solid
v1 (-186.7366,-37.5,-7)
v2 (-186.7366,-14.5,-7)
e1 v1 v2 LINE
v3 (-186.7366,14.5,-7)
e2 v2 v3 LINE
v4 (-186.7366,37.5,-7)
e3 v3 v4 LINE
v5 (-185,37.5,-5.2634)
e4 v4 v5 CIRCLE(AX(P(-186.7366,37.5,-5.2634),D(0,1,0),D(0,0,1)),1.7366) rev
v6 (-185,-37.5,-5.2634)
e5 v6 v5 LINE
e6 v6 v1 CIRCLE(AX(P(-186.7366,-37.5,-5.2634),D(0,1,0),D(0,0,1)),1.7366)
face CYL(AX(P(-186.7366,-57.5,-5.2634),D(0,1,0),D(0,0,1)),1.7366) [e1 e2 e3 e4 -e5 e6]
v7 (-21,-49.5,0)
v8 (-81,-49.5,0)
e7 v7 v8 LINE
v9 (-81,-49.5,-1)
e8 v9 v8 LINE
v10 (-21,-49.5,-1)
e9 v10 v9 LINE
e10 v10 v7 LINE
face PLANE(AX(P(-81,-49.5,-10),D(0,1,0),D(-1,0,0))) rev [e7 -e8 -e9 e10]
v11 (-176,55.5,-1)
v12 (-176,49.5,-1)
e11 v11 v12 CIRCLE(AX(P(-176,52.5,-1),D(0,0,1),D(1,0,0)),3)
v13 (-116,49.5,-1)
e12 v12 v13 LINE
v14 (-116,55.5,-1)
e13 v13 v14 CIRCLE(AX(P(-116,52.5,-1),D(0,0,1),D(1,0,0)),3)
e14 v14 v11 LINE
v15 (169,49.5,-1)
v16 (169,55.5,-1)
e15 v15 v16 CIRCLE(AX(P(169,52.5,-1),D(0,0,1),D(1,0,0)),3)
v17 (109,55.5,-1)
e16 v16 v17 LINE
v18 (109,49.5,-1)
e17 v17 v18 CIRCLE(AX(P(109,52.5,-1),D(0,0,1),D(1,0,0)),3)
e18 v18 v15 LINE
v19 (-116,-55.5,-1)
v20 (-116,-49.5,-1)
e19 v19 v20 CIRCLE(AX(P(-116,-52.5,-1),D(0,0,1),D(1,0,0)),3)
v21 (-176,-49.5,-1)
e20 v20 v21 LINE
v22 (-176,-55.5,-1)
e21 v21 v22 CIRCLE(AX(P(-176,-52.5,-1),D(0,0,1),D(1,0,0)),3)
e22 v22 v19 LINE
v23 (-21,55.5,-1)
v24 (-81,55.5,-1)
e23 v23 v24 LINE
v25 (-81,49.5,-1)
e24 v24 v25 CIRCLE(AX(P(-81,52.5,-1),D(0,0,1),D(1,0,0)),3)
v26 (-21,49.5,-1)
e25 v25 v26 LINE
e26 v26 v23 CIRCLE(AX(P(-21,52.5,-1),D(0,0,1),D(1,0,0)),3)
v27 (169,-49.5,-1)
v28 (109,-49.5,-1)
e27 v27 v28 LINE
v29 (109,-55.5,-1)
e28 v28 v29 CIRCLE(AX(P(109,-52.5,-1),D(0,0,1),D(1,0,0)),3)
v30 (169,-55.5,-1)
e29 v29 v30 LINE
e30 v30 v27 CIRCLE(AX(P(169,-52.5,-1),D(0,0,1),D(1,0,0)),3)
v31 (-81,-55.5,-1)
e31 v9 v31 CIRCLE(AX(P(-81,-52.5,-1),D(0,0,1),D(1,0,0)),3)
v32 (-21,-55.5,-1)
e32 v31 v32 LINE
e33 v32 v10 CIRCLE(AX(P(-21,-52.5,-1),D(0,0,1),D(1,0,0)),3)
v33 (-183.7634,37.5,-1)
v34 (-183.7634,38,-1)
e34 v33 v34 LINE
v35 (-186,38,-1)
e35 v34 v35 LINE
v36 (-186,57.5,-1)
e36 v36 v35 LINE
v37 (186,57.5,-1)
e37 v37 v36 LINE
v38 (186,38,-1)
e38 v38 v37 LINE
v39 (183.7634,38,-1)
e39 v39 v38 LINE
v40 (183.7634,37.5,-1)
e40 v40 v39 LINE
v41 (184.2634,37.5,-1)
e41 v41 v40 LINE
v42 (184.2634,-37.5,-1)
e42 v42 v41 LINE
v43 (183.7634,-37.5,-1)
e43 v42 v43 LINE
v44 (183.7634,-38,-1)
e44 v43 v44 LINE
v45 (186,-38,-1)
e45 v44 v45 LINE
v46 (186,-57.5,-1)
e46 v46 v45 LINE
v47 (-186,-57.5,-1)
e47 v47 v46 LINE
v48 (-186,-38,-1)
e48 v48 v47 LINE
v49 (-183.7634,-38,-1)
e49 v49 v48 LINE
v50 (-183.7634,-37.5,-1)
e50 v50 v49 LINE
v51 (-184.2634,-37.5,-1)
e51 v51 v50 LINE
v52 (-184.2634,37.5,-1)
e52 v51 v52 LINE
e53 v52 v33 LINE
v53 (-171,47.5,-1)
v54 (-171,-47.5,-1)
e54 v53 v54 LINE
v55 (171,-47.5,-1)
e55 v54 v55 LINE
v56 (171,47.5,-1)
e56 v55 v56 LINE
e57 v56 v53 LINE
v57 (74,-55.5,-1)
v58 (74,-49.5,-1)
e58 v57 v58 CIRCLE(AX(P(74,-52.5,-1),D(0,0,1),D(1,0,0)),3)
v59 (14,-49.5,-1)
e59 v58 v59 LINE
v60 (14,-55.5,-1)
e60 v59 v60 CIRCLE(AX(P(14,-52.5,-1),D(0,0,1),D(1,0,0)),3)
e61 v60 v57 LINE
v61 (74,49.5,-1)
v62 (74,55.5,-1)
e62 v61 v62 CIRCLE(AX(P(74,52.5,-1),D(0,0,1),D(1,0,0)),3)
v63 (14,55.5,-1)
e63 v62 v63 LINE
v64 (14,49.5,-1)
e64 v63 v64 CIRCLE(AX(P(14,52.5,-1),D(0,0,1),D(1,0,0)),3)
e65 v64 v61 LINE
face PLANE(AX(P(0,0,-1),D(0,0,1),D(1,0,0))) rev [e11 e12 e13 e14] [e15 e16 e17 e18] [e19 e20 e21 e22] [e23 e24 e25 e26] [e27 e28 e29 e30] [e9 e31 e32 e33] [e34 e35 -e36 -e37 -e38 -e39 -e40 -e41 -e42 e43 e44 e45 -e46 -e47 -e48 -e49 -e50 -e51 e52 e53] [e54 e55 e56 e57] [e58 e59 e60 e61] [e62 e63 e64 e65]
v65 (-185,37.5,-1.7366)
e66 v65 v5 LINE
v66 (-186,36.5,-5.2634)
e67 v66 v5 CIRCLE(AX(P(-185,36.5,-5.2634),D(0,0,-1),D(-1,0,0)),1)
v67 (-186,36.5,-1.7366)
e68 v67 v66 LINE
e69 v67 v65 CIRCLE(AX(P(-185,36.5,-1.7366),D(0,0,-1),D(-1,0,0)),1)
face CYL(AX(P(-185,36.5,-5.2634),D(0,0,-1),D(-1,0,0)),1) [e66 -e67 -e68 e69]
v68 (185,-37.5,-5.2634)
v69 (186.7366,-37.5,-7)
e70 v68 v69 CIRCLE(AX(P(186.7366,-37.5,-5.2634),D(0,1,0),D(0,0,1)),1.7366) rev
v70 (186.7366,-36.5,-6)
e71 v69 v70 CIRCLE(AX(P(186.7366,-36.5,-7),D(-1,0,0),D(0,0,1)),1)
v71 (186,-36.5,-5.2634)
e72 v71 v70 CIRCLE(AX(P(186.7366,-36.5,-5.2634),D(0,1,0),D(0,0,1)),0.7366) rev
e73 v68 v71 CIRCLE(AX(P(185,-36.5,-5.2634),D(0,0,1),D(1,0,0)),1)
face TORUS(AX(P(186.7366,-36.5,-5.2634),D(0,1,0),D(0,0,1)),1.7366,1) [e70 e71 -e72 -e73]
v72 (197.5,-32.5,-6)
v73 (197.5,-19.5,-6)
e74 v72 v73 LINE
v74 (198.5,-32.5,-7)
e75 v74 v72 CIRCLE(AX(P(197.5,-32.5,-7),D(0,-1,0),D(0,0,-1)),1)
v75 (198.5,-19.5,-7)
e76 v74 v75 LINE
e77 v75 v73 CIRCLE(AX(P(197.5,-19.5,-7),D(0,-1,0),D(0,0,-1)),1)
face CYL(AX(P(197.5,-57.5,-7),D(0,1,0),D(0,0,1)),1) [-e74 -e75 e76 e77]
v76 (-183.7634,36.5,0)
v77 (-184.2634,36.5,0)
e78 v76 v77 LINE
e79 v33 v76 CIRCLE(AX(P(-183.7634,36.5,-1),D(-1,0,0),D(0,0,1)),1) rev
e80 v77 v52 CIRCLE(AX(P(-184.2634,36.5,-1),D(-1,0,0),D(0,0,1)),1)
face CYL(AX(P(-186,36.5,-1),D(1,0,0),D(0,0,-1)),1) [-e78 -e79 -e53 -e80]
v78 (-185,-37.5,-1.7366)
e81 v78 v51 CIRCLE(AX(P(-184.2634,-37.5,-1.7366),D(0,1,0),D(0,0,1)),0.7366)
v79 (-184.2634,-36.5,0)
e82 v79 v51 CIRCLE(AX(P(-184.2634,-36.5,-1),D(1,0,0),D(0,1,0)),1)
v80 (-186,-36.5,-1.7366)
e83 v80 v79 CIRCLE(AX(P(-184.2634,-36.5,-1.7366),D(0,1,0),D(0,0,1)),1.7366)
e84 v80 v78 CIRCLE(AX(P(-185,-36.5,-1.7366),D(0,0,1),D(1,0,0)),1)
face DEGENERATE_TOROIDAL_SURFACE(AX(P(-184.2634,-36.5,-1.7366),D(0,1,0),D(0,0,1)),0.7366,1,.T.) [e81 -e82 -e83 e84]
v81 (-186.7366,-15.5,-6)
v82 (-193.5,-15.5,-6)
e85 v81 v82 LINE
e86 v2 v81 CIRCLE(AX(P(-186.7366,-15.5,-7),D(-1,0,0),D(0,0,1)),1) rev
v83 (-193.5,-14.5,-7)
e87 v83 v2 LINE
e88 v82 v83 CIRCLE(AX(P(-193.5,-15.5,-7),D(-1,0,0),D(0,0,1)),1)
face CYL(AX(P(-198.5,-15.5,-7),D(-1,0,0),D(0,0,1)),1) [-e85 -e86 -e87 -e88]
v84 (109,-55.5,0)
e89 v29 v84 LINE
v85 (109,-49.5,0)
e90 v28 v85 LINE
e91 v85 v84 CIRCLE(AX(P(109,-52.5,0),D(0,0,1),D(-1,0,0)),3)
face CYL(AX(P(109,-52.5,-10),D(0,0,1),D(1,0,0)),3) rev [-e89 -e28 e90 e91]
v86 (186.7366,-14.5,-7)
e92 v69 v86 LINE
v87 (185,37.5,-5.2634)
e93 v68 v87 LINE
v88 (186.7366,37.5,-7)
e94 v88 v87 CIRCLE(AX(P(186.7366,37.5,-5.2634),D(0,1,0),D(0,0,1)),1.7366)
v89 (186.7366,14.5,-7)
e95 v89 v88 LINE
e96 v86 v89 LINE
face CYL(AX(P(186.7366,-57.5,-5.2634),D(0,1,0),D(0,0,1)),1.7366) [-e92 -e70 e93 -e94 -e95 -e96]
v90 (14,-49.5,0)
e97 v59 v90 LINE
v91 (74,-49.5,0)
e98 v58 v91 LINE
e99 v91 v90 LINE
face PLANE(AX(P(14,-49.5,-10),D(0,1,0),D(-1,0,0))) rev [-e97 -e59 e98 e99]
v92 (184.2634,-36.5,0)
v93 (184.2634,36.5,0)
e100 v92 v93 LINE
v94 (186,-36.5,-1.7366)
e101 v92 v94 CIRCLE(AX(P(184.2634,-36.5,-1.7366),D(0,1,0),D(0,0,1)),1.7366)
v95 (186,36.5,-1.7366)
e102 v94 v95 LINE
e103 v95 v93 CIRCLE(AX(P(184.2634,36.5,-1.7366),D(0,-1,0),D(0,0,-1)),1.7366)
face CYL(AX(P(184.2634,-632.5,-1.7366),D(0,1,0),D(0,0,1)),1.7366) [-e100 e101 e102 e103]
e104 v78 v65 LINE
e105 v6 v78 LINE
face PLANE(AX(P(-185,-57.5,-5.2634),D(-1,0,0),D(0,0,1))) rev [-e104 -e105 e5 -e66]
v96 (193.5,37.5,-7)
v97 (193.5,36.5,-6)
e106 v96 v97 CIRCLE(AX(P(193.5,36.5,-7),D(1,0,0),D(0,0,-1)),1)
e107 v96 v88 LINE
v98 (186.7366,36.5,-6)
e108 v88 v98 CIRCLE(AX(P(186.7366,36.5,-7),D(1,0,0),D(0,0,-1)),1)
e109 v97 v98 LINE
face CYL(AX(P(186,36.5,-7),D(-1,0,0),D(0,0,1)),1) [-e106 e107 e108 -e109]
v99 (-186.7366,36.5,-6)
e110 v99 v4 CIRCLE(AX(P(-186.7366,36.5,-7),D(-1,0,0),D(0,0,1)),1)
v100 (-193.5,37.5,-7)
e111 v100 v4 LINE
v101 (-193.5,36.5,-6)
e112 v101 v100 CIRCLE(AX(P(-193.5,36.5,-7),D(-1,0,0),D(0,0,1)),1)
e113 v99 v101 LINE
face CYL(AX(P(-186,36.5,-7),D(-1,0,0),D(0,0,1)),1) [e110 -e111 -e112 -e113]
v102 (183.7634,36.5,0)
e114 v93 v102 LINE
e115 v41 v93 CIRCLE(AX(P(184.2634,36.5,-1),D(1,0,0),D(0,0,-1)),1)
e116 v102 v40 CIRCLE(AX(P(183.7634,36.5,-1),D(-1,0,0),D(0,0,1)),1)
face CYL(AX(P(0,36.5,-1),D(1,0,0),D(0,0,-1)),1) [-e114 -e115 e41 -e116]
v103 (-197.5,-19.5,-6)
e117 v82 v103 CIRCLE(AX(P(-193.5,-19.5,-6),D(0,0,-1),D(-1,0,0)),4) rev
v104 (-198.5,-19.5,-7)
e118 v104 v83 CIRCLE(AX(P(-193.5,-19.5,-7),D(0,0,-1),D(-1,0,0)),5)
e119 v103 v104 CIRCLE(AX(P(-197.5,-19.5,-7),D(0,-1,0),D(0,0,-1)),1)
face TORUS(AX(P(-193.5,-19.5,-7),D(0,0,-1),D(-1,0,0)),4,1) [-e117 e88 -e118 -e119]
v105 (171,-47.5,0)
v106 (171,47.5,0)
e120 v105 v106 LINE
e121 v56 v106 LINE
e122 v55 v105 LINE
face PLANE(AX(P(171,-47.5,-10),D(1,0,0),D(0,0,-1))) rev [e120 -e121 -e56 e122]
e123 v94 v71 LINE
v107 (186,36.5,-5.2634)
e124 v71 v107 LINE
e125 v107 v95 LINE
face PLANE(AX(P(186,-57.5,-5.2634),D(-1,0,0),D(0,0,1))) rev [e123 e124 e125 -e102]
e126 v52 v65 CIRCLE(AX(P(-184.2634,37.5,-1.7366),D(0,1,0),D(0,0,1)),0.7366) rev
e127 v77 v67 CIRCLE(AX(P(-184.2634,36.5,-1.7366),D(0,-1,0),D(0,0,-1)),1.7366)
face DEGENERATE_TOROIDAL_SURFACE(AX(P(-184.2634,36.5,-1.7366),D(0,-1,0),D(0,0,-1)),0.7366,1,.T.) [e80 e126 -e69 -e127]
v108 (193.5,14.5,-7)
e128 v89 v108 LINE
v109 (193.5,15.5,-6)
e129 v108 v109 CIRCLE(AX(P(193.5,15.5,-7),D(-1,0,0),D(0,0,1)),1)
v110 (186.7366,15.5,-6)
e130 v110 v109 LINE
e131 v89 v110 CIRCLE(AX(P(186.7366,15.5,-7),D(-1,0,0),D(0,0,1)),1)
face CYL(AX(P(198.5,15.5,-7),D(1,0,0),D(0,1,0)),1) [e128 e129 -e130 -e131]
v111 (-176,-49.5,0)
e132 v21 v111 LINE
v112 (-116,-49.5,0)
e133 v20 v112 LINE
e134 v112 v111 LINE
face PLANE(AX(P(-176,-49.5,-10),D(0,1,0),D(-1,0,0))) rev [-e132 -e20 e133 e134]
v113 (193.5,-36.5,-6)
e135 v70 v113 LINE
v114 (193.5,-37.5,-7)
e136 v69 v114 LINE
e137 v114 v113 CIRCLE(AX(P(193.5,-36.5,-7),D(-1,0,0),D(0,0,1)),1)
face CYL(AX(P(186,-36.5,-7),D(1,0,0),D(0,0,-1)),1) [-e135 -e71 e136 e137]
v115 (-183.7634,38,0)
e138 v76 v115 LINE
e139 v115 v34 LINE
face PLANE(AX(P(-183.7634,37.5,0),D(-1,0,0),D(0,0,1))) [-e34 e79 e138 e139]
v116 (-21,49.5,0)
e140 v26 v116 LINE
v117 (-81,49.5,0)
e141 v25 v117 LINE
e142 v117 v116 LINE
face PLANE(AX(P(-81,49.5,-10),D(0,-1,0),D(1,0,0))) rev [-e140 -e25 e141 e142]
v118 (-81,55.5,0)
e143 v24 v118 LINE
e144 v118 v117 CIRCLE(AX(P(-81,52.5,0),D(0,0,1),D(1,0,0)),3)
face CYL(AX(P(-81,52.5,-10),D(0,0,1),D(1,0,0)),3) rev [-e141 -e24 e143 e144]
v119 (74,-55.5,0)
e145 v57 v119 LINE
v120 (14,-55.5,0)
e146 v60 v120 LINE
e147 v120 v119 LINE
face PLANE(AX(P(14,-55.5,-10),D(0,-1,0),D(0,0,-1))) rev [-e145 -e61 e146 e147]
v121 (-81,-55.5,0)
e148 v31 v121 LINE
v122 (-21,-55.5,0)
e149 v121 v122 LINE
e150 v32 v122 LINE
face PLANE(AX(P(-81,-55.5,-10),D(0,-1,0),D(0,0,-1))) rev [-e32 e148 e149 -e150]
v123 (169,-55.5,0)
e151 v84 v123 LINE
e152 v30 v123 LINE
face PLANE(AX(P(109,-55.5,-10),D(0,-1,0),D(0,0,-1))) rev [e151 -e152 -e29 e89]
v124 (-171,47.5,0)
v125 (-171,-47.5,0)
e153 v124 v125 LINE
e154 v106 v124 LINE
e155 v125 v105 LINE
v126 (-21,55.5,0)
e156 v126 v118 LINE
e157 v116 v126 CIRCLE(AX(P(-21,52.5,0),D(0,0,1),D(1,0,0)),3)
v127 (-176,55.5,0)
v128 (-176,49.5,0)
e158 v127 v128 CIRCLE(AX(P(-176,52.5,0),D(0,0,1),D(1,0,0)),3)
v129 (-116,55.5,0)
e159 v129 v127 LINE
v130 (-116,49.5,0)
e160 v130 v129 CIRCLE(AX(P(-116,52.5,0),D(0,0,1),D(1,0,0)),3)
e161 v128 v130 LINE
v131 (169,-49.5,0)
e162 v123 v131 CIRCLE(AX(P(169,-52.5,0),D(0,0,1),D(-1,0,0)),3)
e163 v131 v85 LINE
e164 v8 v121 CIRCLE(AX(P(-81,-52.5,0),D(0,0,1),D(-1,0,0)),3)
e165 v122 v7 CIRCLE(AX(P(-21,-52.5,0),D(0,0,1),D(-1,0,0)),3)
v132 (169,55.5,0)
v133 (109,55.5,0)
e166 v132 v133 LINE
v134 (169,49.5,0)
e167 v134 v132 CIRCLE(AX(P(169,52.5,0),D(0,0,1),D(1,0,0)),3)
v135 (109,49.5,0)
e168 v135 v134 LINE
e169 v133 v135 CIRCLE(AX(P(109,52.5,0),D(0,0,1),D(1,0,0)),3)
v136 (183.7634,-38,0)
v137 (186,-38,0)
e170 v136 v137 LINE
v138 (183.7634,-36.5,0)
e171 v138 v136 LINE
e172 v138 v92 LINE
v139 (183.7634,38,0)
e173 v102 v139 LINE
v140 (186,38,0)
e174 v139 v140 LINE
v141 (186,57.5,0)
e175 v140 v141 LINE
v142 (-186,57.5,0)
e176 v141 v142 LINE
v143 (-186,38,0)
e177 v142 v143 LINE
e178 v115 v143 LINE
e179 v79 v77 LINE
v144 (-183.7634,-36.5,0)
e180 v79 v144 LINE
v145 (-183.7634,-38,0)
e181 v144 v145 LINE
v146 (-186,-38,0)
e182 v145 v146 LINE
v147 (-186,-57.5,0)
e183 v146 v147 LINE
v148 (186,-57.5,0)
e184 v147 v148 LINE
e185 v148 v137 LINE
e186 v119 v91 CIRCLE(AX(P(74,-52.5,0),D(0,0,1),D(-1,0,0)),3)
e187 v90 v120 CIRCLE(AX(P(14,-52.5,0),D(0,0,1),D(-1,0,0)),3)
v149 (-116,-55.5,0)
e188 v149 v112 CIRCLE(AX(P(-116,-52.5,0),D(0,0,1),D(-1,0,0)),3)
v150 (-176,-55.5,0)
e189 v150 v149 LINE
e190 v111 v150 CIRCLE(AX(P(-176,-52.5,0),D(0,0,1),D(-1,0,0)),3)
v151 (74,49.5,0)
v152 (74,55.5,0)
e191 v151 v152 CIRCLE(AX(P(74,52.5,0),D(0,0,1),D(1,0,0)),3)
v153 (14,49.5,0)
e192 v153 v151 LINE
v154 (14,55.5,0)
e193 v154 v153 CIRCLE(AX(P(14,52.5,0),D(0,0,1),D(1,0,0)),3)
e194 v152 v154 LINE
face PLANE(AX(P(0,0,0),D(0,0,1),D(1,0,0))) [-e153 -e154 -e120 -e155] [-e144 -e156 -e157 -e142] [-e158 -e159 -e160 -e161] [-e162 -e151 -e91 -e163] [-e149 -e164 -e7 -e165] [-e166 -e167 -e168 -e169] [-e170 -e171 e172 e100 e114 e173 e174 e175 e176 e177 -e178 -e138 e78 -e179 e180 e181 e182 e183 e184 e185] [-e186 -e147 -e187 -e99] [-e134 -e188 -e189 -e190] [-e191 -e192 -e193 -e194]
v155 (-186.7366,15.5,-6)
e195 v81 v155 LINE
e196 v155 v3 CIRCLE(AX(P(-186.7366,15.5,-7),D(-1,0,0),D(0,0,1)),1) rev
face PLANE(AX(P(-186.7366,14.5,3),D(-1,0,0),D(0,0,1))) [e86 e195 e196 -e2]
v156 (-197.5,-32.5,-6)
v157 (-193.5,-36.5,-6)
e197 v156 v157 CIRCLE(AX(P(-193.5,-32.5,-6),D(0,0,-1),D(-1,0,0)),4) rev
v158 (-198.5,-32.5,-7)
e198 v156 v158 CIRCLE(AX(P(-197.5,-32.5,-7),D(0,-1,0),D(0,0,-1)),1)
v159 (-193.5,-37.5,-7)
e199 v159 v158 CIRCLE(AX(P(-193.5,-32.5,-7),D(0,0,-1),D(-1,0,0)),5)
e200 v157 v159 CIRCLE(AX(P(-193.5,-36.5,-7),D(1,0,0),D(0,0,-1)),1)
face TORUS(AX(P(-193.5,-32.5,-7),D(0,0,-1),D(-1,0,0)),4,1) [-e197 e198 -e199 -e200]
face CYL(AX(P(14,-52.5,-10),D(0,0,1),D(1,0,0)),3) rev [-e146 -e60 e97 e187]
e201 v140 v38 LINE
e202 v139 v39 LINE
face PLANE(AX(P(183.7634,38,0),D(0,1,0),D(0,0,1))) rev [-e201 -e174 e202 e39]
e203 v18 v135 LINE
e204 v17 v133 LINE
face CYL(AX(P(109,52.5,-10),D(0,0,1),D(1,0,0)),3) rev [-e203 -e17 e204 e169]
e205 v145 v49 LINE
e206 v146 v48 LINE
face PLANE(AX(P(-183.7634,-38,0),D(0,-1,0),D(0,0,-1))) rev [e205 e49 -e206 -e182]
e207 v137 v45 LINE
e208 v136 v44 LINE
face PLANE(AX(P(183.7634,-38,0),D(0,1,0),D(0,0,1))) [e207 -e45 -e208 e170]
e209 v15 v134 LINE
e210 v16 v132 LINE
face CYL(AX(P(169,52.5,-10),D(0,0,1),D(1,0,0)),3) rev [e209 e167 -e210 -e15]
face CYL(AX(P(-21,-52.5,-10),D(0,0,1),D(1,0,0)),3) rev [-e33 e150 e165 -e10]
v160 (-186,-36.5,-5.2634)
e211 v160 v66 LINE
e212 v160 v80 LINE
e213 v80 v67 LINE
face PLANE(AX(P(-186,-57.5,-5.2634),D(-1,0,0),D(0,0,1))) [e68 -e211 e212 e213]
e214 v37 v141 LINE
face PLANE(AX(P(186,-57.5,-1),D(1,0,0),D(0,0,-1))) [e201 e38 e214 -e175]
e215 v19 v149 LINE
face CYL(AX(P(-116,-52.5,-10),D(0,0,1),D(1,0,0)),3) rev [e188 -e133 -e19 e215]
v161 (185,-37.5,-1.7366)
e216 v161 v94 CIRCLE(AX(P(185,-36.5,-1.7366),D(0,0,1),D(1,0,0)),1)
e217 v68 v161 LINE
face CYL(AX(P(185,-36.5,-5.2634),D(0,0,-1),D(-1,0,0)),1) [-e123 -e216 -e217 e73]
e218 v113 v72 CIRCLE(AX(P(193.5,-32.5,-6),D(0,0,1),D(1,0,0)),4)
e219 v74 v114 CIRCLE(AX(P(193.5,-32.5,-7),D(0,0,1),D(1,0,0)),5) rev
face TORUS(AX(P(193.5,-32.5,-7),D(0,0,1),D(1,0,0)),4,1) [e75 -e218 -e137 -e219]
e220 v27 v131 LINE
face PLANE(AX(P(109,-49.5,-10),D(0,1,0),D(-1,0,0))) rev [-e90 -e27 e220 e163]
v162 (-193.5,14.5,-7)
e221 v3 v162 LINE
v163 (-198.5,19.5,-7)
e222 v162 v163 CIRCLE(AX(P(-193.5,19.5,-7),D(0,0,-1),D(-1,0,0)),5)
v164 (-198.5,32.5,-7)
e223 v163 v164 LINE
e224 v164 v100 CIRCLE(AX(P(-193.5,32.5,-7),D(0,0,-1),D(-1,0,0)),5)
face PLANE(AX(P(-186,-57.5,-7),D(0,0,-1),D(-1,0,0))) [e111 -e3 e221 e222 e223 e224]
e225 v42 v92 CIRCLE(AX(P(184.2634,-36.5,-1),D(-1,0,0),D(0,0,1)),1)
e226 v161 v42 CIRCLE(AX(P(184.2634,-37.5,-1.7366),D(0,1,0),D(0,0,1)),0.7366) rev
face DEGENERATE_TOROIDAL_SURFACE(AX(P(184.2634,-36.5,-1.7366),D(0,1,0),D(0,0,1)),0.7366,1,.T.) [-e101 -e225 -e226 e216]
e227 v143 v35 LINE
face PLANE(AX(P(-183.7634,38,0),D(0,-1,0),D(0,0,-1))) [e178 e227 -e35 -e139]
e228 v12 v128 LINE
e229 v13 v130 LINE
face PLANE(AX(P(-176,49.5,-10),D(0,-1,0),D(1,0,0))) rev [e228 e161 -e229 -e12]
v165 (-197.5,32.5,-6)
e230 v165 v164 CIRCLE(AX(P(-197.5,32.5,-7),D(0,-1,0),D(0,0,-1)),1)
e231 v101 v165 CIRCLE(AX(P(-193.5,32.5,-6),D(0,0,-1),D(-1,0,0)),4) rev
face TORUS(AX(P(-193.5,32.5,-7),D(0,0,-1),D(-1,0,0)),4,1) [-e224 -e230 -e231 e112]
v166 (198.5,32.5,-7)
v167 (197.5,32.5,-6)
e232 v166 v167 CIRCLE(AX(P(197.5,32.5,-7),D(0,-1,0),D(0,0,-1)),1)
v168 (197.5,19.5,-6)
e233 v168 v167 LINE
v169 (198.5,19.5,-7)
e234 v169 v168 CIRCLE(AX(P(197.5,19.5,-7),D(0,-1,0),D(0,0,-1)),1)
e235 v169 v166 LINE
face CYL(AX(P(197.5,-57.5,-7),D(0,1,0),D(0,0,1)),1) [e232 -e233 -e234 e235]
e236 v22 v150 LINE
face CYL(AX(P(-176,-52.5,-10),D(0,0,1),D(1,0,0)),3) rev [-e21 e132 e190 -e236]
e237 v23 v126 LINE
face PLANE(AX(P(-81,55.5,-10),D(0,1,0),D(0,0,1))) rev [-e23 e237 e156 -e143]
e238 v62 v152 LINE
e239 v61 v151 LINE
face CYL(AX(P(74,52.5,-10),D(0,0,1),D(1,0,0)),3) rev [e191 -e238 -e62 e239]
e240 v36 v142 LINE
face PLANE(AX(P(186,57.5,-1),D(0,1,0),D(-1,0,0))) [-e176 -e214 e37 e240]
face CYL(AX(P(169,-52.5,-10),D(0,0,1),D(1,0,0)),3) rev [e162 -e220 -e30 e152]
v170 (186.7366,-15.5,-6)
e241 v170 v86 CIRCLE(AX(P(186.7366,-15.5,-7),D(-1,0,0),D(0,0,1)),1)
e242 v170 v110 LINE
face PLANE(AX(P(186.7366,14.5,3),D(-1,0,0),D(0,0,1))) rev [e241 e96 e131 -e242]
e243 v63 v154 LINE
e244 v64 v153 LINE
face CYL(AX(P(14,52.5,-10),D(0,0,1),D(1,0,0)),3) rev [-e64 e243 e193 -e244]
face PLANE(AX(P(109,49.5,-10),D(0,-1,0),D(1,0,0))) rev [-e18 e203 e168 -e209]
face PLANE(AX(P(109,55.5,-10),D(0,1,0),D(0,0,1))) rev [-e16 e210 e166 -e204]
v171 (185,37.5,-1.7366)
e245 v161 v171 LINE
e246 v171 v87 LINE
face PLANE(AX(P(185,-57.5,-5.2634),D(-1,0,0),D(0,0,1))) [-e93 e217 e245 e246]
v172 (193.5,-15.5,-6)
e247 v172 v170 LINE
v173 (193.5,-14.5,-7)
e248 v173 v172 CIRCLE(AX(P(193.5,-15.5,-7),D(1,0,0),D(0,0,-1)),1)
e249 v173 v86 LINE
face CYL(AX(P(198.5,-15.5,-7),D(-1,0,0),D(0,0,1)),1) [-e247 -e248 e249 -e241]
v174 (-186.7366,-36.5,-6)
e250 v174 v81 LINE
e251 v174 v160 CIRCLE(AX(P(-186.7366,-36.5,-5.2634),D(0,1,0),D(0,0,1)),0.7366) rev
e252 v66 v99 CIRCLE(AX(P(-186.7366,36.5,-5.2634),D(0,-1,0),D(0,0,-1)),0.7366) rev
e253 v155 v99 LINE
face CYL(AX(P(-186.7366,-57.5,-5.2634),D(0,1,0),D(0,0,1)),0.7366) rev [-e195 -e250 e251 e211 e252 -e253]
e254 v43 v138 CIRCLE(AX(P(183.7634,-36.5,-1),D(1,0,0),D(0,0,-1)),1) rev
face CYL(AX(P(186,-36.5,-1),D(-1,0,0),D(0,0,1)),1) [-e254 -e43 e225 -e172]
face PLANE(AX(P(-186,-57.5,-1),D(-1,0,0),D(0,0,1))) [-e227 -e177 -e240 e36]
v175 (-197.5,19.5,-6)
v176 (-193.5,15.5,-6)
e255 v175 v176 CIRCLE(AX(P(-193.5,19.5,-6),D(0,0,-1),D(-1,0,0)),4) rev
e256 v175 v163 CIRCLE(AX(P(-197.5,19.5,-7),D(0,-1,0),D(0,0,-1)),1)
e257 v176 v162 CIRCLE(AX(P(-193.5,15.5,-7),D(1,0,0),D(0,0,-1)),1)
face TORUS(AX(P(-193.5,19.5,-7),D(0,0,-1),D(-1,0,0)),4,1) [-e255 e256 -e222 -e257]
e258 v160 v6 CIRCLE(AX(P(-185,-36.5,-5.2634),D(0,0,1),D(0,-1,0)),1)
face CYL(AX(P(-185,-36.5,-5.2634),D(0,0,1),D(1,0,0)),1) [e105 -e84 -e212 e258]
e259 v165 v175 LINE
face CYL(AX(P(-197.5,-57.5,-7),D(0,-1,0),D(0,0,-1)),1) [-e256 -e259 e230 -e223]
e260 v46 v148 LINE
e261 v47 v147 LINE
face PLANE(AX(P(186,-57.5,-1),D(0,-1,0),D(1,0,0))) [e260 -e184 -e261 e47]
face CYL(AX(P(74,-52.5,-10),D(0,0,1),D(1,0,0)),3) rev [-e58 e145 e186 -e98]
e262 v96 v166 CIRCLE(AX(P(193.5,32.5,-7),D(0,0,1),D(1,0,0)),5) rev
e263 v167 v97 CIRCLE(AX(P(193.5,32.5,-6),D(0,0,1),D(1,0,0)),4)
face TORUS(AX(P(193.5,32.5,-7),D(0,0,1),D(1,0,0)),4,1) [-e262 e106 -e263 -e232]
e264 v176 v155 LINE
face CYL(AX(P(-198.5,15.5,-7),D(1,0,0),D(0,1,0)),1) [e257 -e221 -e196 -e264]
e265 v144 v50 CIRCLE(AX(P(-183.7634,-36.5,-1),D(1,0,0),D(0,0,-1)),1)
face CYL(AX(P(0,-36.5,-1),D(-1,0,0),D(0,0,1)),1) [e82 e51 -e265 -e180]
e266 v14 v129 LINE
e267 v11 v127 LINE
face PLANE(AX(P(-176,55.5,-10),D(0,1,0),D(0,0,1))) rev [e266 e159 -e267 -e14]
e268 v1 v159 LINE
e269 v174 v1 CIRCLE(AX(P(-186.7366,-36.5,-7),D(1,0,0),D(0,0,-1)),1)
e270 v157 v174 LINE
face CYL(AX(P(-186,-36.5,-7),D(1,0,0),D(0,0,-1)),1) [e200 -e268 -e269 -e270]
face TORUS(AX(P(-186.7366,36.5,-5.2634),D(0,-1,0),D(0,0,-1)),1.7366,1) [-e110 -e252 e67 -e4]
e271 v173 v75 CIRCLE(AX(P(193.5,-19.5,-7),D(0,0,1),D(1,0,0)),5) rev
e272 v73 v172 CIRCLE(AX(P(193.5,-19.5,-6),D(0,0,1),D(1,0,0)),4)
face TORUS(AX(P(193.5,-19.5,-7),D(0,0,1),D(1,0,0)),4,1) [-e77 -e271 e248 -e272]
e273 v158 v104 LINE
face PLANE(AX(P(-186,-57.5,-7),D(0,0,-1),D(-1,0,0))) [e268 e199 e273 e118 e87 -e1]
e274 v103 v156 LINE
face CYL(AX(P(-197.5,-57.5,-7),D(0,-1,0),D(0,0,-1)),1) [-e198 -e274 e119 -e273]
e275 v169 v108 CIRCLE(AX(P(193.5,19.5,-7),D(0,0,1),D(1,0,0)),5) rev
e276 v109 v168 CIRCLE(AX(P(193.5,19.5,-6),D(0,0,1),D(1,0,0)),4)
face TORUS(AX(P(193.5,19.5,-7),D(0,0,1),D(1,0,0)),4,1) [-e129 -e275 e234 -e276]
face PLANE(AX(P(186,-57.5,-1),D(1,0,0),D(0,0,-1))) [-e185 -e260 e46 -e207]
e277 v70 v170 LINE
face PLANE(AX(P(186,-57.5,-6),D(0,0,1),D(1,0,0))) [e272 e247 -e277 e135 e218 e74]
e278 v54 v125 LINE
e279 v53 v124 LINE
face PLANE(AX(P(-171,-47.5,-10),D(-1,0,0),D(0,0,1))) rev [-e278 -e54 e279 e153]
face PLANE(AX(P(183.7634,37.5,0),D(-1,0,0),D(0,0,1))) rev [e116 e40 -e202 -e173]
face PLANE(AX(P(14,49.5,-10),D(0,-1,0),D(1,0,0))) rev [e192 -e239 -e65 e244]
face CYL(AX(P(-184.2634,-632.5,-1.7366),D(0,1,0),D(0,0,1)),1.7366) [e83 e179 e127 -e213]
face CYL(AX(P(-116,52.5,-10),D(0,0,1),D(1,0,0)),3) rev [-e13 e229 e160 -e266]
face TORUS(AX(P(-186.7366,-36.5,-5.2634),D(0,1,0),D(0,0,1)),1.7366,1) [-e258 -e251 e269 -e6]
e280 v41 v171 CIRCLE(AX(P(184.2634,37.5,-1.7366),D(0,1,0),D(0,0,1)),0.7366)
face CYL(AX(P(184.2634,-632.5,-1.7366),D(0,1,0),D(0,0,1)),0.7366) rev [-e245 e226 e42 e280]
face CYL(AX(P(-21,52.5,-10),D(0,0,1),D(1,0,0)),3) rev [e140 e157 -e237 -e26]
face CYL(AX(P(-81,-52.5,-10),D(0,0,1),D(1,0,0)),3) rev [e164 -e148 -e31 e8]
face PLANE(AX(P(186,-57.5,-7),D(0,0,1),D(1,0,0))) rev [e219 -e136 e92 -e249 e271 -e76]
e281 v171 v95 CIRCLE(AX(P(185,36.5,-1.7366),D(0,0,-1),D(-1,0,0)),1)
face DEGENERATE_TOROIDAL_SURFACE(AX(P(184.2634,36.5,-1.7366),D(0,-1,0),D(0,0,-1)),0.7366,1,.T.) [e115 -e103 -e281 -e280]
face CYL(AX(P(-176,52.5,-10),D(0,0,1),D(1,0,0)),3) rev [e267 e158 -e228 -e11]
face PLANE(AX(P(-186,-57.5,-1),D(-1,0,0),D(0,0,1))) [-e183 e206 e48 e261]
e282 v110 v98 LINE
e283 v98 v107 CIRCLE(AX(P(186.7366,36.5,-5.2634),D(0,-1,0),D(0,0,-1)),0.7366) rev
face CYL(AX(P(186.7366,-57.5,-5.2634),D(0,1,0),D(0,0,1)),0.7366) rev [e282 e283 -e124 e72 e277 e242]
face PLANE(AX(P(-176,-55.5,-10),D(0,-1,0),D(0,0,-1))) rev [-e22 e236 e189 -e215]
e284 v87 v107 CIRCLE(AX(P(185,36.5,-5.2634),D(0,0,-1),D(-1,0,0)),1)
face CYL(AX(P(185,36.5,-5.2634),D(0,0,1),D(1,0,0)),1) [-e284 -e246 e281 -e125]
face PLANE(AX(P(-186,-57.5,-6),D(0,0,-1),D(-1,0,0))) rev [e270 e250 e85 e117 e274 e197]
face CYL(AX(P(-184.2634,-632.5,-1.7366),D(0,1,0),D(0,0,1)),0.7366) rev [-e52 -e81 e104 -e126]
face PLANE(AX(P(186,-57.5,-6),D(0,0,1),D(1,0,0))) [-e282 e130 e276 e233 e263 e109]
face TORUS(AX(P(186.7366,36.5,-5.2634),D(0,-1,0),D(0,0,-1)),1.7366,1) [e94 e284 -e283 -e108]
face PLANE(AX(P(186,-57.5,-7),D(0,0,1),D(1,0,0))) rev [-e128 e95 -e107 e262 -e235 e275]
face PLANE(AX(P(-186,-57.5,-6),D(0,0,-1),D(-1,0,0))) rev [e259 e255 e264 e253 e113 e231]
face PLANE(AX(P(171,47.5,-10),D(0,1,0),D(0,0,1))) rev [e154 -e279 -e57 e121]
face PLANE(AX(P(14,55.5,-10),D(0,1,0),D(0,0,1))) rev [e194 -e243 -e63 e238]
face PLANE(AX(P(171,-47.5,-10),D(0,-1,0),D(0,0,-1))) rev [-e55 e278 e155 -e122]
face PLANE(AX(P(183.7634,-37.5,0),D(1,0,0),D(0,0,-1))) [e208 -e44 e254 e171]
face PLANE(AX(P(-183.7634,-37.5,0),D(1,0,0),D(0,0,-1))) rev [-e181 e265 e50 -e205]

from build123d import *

# Parameters (mm, degrees)
SKETCH_1_W             = 372
SKETCH_1_H             = 115
SM_BASE_FLANGE_1_DEPTH = 1
SKETCH_6_W             = 342
SKETCH_6_H             = 95
CUT_EXTRUDE_1_DEPTH    = 10
CUT_EXTRUDE_2_DEPTH    = 10
PATTERN_LINEAR_1_COUNT = 4
PATTERN_LINEAR_1_PITCH = 95
OTHER_START            = -38
OTHER_1_DEPTH          = 76
OTHER_1_2_DEPTH        = 0.5
OTHER_START_2          = 37.5
OTHER_1_3_DEPTH        = 0.5
OTHER_START_3          = -37.5
OTHER_1_4_DEPTH        = 75
SKETCH_15_W            = 11.7634
SKETCH_15_H            = 29
CUT_EXTRUDE_3_DEPTH    = 10
FILLET_1_R             = 5
FILLET_2_R             = 1
FILLET_1_OF_MIRROR_1_R = 5
FILLET_2_OF_MIRROR_1_R = 1


# Read off the part's stored shape, not the designer's step: 斜接法兰1
# Sheet-metal steps are written as plain solids
with BuildPart() as part:
    # Sketch 1 → 基体-法兰1 (new body)
    with BuildSketch(Plane.XY):
        Rectangle(SKETCH_1_W, SKETCH_1_H)
    extrude(amount=-SM_BASE_FLANGE_1_DEPTH)

    # 草图6 → 切除-拉伸1 (cut)
    with BuildSketch(Plane.XY):
        Rectangle(SKETCH_6_W, SKETCH_6_H)
    extrude(amount=-CUT_EXTRUDE_1_DEPTH, mode=Mode.SUBTRACT)

    # 草图7 → 切除-拉伸2 (cut)
    with BuildSketch(Plane.XY):
        with BuildLine():
            Line((-176, 55.5), (-116, 55.5))
            ThreePointArc((-116, 55.5), (-113, 52.5), (-116, 49.5))
            Line((-116, 49.5), (-176, 49.5))
            ThreePointArc((-176, 49.5), (-179, 52.5), (-176, 55.5))
        make_face()
        with BuildLine():
            Line((-176, -55.5), (-116, -55.5))
            ThreePointArc((-116, -55.5), (-113, -52.5), (-116, -49.5))
            Line((-116, -49.5), (-176, -49.5))
            ThreePointArc((-176, -49.5), (-179, -52.5), (-176, -55.5))
        make_face()
    cut_extrude_2 = extrude(amount=-CUT_EXTRUDE_2_DEPTH, mode=Mode.SUBTRACT)

    # 阵列(线性)1: 切除-拉伸2 ×4
    with Locations(*[(i * PATTERN_LINEAR_1_PITCH, 0, 0) for i in range(1, PATTERN_LINEAR_1_COUNT)]):
        add(cut_extrude_2, mode=Mode.SUBTRACT)

    # Other 1 outline → Other 1 (cut)
    with BuildSketch(Plane(origin=(0, 0, 0), x_dir=(1, 0, 0), z_dir=(0, 1, 0)).offset(OTHER_START)):
        with BuildLine():
            Line((186, 1), (185.83604109, 1))
            ThreePointArc((185.83604109, 1), (185.195226164, 0.271171885), (184.2634, 0))
            Line((184.2634, 0), (186, 0))
            Line((186, 0), (186, 1))
        make_face()
    other_1 = extrude(amount=OTHER_1_DEPTH, mode=Mode.SUBTRACT)

    # Other 1 2 outline → Other 1 2 (cut)
    with BuildSketch(Plane(origin=(0, 0, 0), x_dir=(1, 0, 0), z_dir=(0, 1, 0)).offset(OTHER_START)):
        with BuildLine():
            ThreePointArc((184.2634, 0), (185.195226164, 0.271171885), (185.83604109, 1))
            Line((185.83604109, 1), (183.7634, 1))
            Line((183.7634, 1), (183.7634, 0))
            Line((183.7634, 0), (184.2634, 0))
        make_face()
    other_1_2 = extrude(amount=OTHER_1_2_DEPTH, mode=Mode.SUBTRACT)

    # Other 1 3 outline → Other 1 3 (cut)
    with BuildSketch(Plane(origin=(0, 0, 0), x_dir=(1, 0, 0), z_dir=(0, 1, 0)).offset(OTHER_START_2)):
        with BuildLine():
            ThreePointArc((184.2634, 0), (185.195226164, 0.271171885), (185.83604109, 1))
            Line((185.83604109, 1), (183.7634, 1))
            Line((183.7634, 1), (183.7634, 0))
            Line((183.7634, 0), (184.2634, 0))
        make_face()
    other_1_3 = extrude(amount=OTHER_1_3_DEPTH, mode=Mode.SUBTRACT)

    # Other 1 4 outline → Other 1 4 (add)
    with BuildSketch(Plane(origin=(0, 0, 0), x_dir=(1, 0, 0), z_dir=(0, 1, 0)).offset(OTHER_START_3)):
        with BuildLine():
            Line((186, 1.7366), (186, 5.2634))
            ThreePointArc((186, 5.2634), (186.215745145, 5.784254855), (186.7366, 6))
            Line((186.7366, 6), (198.5, 6))
            Line((198.5, 6), (198.5, 7))
            Line((198.5, 7), (186.7366, 7))
            ThreePointArc((186.7366, 7), (185.508638364, 6.491361636), (185, 5.2634))
            Line((185, 5.2634), (185, 1.7366))
            ThreePointArc((185, 1.7366), (184.784254855, 1.215745145), (184.2634, 1))
            Line((184.2634, 1), (185.83604109, 1))
            ThreePointArc((185.83604109, 1), (185.958514757, 1.359286442), (186, 1.7366))
        make_face()
    other_1_4 = extrude(amount=OTHER_1_4_DEPTH)

    # 草图15 → 切除-拉伸3 (cut)
    with BuildSketch(Plane(origin=(0, 0, -7), x_dir=(-1, 0, 0), z_dir=(0, 0, -1))):
        with Locations((-192.6183, 0)):
            Rectangle(SKETCH_15_W, SKETCH_15_H)
    cut_extrude_3 = extrude(amount=-CUT_EXTRUDE_3_DEPTH, mode=Mode.SUBTRACT)

    # 圆角1
    fillet_1_edges = [part.edges().sort_by_distance(p)[0] for p in [
        (198.5, -37.5, -6.5),
        (198.5, 37.5, -6.5),
        (198.5, -14.5, -6.5),
        (198.5, 14.5, -6.5),
    ]]
    fillet(fillet_1_edges, radius=FILLET_1_R)

    # 圆角2
    fillet_2_edges = [part.edges().sort_by_distance(p)[0] for p in [
        (184.0134, -37.5, 0),
        (184.0134, 37.5, 0),
        (186, -37.5, -3.5),
        (186, 37.5, -3.5),
        (186.215745145, 37.5, -5.784254855),
        (186.215745145, -37.5, -5.784254855),
        (190.1183, -37.5, -6),
        (185.195226164, -37.5, -0.271171885),
        (185.195226164, 37.5, -0.271171885),
        (190.1183, -14.5, -6),
        (198.5, 26, -6),
        (190.1183, 14.5, -6),
        (190.1183, 37.5, -6),
        (197.035533906, 36.035533906, -6),
        (197.035533906, 15.964466094, -6),
        (198.5, -26, -6),
        (197.035533906, -15.964466094, -6),
        (197.035533906, -36.035533906, -6),
    ]]
    fillet(fillet_2_edges, radius=FILLET_2_R - 0.0001)  # a hair under: the kernel refuses the full size

    # 镜向1: Other 1, Other 1 2, Other 1 3, Other 1 4, 切除-拉伸3 across plane
    add(other_1.mirror(Plane(origin=(0, 0, 0), x_dir=(0, 0, 1), z_dir=(1, 0, 0))), mode=Mode.SUBTRACT)
    add(other_1_2.mirror(Plane(origin=(0, 0, 0), x_dir=(0, 0, 1), z_dir=(1, 0, 0))), mode=Mode.SUBTRACT)
    add(other_1_3.mirror(Plane(origin=(0, 0, 0), x_dir=(0, 0, 1), z_dir=(1, 0, 0))), mode=Mode.SUBTRACT)
    add(other_1_4.mirror(Plane(origin=(0, 0, 0), x_dir=(0, 0, 1), z_dir=(1, 0, 0))))
    add(cut_extrude_3.mirror(Plane(origin=(0, 0, 0), x_dir=(0, 0, 1), z_dir=(1, 0, 0))), mode=Mode.SUBTRACT)

    # 圆角1 of 镜向1
    fillet_1_of_mirror_1_edges = [part.edges().sort_by_distance(p)[0] for p in [
        (-198.5, -37.5, -6.5),
        (-198.5, 37.5, -6.5),
        (-198.5, -14.5, -6.5),
        (-198.5, 14.5, -6.5),
    ]]
    fillet(fillet_1_of_mirror_1_edges, radius=FILLET_1_OF_MIRROR_1_R)

    # 圆角2 of 镜向1
    fillet_2_of_mirror_1_edges = [part.edges().sort_by_distance(p)[0] for p in [
        (-184.0134, -37.5, 0),
        (-184.0134, 37.5, 0),
        (-186, -37.5, -3.5),
        (-186, 37.5, -3.5),
        (-186.215745145, 37.5, -5.784254855),
        (-186.215745145, -37.5, -5.784254855),
        (-190.1183, -37.5, -6),
        (-185.195226164, -37.5, -0.271171885),
        (-185.195226164, 37.5, -0.271171885),
        (-190.1183, -14.5, -6),
        (-198.5, 26, -6),
        (-190.1183, 14.5, -6),
        (-190.1183, 37.5, -6),
        (-197.035533906, 36.035533906, -6),
        (-197.035533906, 15.964466094, -6),
        (-198.5, -26, -6),
        (-197.035533906, -15.964466094, -6),
        (-197.035533906, -36.035533906, -6),
    ]]
    fillet(fillet_2_of_mirror_1_edges, radius=FILLET_2_OF_MIRROR_1_R - 0.0001)  # a hair under: the kernel refuses the full size


solid = part.part
